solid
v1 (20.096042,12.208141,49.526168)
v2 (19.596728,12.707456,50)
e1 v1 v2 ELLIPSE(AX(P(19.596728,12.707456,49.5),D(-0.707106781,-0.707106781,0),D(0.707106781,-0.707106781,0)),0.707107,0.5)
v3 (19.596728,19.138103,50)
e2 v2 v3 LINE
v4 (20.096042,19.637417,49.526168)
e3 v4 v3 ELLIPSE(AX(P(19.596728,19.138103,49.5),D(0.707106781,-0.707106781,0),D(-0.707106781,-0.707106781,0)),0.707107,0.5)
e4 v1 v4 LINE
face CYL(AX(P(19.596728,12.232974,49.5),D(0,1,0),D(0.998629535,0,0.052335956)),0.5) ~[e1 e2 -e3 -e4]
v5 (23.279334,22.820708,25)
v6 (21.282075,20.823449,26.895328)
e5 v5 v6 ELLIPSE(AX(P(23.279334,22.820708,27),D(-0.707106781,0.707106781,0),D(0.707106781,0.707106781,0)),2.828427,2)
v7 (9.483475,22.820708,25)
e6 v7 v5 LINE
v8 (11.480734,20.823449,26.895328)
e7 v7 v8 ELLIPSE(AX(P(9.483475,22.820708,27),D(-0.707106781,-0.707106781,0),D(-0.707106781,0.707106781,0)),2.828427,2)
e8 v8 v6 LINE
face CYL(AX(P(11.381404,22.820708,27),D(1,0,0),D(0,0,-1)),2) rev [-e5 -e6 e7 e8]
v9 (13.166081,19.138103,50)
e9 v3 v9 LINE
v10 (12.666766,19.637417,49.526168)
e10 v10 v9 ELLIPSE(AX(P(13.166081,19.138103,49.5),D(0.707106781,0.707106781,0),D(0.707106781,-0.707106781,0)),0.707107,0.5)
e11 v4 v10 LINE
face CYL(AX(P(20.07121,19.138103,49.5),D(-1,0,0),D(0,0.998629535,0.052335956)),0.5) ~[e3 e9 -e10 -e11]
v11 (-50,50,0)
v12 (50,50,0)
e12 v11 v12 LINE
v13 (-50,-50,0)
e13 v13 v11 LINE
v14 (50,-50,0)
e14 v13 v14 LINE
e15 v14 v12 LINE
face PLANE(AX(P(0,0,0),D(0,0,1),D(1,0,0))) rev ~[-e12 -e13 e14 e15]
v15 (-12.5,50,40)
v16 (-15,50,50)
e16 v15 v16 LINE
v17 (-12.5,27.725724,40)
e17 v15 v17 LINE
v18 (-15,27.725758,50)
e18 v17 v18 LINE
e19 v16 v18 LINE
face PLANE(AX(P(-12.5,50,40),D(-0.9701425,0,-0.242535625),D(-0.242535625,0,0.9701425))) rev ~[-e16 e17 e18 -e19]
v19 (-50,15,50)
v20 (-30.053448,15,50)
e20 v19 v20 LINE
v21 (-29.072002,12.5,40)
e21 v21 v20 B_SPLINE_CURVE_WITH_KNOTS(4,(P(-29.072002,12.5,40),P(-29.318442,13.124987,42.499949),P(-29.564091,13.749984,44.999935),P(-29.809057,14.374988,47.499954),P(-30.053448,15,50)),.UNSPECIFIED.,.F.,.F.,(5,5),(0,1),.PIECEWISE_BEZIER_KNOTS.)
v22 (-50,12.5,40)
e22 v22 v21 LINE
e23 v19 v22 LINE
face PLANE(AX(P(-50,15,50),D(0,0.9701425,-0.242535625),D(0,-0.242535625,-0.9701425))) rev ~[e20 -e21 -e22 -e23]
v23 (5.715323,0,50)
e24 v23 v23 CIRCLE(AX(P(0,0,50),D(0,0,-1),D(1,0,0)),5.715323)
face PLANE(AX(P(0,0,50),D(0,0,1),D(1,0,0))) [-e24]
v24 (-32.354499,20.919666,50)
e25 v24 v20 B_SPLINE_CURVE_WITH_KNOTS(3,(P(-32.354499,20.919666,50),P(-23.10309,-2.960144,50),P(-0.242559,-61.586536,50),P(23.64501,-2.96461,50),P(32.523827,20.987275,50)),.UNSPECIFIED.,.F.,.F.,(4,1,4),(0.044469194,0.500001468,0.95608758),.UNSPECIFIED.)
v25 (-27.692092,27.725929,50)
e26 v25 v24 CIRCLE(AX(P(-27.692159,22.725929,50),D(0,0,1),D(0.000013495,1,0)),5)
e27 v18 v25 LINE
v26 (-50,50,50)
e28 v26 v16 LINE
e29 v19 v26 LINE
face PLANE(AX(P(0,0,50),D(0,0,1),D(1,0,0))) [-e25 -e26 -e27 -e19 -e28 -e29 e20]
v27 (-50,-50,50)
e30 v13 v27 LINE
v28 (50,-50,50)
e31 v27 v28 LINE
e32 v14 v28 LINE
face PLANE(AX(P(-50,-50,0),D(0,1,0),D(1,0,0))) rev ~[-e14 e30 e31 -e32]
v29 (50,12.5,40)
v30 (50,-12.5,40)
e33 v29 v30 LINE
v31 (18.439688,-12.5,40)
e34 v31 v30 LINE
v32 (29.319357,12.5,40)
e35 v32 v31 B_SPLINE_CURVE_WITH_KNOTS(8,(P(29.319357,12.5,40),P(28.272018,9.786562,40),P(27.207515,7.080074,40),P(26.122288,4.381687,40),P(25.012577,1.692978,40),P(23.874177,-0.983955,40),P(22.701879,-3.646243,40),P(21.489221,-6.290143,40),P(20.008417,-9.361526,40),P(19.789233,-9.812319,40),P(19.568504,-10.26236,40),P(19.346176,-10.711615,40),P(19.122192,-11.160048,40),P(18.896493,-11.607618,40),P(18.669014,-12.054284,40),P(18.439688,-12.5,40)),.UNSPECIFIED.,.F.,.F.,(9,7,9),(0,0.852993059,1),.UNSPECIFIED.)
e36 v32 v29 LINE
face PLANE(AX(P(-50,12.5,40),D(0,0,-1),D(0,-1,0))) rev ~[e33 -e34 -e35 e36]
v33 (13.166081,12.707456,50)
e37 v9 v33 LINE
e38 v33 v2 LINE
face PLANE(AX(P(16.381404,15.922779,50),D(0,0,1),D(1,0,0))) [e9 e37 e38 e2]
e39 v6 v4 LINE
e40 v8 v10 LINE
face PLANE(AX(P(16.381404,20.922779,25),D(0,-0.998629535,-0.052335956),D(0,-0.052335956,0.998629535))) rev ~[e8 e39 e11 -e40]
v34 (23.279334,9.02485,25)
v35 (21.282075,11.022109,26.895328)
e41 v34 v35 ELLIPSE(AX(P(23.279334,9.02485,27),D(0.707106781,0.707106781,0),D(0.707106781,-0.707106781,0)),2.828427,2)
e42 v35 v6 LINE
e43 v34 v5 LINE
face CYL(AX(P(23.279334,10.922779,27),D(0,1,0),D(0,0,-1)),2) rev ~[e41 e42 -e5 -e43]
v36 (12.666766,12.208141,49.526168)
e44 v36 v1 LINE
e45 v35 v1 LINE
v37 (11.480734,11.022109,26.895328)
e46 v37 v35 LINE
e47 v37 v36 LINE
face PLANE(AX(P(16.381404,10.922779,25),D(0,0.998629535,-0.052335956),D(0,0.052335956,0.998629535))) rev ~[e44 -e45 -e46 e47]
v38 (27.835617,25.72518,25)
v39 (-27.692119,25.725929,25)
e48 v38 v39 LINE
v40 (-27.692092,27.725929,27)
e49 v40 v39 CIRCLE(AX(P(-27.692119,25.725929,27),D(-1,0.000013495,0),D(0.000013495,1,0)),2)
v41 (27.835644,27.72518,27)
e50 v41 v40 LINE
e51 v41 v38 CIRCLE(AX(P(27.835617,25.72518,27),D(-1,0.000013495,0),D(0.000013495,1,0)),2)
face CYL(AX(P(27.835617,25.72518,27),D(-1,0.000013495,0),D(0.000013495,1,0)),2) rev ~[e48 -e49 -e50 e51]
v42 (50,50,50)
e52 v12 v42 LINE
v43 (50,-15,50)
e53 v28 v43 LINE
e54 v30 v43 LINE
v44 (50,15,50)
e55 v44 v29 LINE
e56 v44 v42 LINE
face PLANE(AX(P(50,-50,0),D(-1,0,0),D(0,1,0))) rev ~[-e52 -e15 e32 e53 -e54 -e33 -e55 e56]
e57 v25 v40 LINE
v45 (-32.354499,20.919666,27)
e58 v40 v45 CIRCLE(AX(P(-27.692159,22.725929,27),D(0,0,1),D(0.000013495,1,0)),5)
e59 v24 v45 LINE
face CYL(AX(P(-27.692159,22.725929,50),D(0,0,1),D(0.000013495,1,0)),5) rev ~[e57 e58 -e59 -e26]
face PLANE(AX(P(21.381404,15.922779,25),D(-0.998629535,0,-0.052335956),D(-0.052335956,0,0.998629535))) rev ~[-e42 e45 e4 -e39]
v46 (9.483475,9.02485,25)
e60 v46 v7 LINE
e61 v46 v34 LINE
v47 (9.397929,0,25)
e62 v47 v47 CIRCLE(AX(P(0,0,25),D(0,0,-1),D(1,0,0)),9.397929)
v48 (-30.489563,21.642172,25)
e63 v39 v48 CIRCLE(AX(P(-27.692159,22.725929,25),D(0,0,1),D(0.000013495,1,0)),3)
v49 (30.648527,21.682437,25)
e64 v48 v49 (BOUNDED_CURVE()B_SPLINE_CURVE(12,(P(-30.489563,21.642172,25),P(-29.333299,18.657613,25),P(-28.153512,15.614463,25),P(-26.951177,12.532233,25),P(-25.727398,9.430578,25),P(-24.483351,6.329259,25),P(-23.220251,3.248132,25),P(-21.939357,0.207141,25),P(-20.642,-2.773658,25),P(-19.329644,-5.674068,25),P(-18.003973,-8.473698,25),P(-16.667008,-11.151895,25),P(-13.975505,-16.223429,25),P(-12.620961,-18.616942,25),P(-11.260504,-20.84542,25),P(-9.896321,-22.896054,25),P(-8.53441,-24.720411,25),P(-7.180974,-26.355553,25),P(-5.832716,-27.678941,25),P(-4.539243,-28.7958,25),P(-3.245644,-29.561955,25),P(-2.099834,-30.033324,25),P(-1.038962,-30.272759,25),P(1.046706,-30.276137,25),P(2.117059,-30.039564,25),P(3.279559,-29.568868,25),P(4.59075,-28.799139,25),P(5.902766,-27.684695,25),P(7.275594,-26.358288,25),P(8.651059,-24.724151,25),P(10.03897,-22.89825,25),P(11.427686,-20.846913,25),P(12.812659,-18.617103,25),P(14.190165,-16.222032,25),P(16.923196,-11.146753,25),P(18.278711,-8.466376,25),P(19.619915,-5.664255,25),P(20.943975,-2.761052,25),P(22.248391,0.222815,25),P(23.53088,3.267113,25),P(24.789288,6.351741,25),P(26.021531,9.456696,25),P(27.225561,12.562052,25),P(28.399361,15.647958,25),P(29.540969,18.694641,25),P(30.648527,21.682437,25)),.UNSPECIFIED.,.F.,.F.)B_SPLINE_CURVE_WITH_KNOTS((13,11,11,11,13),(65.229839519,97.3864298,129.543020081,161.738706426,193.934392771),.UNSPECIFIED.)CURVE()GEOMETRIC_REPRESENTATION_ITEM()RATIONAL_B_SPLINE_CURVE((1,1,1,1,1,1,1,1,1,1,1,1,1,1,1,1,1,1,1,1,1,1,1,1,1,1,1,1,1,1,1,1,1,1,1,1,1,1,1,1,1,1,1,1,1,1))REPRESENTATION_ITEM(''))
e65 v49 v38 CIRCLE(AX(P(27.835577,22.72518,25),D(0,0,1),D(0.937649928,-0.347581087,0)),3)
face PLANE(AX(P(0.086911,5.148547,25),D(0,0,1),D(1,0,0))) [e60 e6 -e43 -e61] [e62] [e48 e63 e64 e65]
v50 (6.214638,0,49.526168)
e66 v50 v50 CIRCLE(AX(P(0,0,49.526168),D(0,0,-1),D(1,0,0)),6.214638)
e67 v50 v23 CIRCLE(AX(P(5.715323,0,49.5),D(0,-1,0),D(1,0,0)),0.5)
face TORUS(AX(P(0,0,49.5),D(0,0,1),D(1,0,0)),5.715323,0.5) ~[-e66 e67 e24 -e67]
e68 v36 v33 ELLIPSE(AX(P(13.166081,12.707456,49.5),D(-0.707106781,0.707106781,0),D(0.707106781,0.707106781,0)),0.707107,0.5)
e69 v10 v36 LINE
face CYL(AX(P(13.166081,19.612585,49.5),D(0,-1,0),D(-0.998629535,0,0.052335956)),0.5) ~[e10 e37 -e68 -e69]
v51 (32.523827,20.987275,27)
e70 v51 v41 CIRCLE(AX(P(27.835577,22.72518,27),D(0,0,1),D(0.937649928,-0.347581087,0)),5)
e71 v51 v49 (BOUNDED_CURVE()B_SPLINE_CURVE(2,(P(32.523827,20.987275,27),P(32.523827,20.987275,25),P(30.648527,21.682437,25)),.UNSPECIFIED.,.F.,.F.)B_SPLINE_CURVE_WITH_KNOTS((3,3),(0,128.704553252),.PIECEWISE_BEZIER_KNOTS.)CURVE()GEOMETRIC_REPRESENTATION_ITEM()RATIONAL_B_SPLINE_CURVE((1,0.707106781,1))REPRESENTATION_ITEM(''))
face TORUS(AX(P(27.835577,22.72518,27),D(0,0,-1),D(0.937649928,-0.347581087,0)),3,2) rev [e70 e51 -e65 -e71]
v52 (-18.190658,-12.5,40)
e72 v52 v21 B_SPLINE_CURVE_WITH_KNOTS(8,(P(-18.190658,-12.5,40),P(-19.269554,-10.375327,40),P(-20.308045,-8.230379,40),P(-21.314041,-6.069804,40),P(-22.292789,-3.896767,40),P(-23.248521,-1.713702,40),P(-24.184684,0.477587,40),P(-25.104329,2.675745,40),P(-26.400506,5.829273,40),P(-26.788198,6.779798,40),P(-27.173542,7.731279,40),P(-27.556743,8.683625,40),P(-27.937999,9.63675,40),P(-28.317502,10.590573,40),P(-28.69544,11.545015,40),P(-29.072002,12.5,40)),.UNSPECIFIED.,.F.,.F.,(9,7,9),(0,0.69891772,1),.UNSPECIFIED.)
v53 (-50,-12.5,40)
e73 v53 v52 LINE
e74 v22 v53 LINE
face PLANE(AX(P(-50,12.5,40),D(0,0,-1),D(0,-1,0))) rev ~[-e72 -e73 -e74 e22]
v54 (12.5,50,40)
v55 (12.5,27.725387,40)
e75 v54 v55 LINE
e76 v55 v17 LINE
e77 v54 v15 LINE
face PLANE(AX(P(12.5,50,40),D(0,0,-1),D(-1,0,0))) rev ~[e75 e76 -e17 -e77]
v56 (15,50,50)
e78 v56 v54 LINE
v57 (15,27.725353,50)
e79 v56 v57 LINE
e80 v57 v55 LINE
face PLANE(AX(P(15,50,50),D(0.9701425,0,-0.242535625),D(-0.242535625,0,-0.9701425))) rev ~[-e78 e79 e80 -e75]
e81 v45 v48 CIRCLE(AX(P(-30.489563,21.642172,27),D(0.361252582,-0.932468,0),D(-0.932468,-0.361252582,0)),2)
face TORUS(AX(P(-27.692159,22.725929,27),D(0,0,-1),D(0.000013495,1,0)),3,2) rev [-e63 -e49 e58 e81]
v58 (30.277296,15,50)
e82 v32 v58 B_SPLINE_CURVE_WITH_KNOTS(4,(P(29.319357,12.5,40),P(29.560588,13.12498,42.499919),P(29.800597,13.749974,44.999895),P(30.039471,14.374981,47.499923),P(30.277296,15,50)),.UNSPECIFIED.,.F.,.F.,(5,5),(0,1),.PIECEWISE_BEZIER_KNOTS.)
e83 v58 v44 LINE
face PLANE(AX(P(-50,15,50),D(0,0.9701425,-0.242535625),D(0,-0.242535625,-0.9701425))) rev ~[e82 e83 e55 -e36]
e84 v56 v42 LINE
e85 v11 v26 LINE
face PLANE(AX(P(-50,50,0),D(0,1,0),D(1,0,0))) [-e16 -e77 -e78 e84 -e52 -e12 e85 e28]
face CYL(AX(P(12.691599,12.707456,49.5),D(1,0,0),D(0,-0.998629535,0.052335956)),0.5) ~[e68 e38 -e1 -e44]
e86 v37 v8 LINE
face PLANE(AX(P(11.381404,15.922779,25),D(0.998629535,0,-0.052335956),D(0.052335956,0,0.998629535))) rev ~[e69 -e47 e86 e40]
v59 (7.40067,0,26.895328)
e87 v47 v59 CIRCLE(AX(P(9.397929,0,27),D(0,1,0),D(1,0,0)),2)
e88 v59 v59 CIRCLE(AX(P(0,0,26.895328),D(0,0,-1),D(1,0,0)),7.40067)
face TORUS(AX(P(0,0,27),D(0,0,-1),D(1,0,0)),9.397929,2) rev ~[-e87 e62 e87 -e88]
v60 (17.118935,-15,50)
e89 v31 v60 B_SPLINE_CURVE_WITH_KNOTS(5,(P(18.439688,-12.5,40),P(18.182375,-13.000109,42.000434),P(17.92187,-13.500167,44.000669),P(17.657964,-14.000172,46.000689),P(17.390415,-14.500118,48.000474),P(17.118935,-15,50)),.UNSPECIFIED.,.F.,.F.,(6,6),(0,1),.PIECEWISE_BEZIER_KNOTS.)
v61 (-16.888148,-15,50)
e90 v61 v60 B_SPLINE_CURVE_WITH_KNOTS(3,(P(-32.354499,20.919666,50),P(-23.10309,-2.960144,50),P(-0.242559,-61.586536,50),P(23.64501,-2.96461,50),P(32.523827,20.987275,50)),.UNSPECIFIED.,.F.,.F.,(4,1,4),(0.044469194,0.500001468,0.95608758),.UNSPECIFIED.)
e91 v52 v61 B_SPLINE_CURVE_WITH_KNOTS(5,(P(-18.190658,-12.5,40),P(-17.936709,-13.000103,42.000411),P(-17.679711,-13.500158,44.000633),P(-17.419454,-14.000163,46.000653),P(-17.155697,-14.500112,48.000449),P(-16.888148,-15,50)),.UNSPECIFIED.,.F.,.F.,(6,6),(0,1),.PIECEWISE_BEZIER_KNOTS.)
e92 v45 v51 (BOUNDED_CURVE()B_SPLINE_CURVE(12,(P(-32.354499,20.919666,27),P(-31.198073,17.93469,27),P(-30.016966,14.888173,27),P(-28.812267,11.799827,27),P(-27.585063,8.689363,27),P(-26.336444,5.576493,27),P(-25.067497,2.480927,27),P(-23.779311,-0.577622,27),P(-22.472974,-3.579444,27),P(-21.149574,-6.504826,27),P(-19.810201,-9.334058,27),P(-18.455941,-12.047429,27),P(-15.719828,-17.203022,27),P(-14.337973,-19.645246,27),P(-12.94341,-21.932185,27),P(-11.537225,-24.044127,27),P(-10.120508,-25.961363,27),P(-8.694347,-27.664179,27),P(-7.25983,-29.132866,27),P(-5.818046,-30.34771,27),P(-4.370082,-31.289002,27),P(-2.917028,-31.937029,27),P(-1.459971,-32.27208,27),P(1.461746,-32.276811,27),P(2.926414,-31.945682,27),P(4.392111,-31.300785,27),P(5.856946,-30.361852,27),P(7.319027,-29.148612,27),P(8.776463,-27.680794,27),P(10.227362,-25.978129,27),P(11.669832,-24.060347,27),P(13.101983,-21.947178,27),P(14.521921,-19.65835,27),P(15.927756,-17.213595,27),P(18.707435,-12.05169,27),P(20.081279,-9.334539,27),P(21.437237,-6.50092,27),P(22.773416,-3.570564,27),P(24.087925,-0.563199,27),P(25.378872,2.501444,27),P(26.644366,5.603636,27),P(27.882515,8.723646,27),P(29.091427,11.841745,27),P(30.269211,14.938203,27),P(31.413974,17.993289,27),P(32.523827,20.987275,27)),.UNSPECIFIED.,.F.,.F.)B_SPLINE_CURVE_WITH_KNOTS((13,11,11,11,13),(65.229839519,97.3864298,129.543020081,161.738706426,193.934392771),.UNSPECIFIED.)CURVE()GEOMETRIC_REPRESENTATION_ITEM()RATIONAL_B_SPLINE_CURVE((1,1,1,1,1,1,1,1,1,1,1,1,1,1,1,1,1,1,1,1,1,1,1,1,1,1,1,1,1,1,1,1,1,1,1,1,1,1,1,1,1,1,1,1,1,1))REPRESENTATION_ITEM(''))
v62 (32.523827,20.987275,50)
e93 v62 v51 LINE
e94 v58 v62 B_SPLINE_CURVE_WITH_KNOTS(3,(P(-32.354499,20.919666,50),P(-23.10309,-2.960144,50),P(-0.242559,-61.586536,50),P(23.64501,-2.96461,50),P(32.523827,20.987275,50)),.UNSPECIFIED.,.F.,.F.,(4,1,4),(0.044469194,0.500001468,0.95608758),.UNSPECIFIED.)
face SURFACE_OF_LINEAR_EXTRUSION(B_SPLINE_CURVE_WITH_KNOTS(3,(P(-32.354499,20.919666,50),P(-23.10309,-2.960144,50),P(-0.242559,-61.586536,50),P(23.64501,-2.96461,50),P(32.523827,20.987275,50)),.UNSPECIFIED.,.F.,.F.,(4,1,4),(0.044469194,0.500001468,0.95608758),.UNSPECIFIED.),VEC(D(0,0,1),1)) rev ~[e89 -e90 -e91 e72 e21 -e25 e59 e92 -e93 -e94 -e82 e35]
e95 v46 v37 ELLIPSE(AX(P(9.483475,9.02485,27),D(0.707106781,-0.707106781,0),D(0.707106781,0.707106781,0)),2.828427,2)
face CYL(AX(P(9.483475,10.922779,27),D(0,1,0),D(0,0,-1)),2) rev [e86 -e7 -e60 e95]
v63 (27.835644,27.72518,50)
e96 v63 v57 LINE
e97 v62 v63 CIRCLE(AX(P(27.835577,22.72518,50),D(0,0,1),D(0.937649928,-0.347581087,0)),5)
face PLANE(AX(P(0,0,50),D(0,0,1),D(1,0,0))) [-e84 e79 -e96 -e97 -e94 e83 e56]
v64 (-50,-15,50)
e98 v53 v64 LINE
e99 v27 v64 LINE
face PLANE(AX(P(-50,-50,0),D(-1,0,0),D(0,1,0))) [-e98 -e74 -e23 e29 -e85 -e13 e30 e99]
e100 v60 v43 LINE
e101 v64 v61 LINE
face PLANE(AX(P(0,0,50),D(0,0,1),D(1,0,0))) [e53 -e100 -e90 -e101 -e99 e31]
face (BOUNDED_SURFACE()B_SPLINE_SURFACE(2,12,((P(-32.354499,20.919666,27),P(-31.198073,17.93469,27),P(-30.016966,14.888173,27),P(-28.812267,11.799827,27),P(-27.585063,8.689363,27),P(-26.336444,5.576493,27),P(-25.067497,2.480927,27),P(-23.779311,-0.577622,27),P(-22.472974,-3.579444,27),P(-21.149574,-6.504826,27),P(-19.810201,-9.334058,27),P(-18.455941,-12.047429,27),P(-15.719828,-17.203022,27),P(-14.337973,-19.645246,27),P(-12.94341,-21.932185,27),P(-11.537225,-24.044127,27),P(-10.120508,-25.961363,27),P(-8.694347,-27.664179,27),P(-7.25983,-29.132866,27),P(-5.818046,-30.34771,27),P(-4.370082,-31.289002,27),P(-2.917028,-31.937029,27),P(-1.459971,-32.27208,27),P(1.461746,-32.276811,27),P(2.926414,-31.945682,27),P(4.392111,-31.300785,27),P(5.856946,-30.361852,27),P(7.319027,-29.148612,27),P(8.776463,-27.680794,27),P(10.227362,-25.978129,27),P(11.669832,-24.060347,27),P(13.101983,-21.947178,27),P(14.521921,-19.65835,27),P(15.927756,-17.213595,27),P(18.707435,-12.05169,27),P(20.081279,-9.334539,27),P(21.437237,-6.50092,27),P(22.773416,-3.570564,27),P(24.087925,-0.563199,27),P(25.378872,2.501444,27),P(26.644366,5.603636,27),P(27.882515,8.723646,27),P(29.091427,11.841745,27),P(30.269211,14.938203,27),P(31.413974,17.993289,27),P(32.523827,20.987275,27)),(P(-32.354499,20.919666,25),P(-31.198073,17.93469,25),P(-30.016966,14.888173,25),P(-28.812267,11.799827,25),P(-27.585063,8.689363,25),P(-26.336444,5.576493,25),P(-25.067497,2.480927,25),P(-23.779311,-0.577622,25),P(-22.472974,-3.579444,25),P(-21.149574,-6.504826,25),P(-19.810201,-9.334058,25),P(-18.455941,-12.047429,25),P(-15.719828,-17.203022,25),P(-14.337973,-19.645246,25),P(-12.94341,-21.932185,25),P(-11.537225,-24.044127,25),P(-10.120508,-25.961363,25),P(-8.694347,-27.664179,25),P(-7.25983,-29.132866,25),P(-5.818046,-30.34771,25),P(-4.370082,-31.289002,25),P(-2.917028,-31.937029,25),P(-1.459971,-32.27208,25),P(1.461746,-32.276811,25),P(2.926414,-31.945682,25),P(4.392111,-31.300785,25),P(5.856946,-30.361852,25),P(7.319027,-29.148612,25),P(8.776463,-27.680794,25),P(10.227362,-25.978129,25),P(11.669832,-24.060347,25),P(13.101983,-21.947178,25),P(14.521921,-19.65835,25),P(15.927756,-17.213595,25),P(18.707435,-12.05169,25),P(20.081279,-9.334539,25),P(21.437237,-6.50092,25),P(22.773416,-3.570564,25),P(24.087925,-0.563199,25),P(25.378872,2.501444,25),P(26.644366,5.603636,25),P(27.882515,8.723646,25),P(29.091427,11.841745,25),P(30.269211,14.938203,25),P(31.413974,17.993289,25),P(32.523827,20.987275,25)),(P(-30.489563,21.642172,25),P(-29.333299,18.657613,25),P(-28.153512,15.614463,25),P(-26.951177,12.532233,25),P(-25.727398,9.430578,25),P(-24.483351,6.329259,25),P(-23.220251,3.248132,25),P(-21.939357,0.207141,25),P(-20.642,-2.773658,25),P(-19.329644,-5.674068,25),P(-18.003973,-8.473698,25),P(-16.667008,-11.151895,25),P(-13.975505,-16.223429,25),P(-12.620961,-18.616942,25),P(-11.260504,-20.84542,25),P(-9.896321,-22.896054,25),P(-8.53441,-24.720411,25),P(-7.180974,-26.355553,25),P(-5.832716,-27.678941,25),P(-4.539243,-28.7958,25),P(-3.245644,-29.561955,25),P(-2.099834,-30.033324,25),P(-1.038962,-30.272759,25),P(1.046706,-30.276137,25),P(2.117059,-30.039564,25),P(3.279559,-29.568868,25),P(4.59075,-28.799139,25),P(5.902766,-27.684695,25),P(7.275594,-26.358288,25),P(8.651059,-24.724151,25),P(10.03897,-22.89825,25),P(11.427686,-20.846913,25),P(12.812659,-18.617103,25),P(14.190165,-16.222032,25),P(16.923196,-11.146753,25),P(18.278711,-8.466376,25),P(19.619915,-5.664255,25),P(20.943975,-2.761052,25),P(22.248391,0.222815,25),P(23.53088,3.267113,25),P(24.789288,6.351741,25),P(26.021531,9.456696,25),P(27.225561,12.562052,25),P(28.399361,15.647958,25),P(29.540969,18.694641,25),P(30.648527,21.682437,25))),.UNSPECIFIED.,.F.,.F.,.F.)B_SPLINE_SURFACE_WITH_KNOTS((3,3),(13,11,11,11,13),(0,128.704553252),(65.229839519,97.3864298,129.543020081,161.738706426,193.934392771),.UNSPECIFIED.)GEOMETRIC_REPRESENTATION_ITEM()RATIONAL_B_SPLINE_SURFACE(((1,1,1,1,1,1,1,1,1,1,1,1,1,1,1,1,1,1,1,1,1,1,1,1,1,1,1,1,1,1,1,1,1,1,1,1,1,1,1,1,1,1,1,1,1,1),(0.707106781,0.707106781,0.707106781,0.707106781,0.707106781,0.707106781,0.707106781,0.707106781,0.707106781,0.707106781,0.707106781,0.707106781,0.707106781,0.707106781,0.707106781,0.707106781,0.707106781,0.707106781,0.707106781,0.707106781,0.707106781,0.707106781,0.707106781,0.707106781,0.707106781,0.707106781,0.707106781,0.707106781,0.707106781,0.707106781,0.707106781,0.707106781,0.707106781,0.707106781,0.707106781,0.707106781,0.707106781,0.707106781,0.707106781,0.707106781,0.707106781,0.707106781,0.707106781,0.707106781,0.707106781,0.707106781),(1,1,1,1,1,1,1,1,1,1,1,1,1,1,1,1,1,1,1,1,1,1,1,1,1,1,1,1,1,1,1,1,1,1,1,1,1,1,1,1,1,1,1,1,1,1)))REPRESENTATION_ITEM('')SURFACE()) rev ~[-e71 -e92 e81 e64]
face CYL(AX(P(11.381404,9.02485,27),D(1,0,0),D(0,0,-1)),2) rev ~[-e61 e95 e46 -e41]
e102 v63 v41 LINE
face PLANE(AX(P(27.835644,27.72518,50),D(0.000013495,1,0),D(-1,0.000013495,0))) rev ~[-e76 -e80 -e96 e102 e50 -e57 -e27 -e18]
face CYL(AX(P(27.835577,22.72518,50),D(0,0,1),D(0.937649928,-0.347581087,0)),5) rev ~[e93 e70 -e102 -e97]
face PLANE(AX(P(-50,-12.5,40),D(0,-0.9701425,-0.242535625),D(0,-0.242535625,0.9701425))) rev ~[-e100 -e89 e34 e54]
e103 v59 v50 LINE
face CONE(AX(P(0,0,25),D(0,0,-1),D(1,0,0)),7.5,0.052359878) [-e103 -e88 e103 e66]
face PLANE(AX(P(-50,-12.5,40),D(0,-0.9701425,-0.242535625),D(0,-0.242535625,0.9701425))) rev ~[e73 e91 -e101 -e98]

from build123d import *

# Parameters (mm, degrees)
F0_W     = 100
F0_H     = 100
F1_DEPTH = 50
F3_DEPTH = 25
F5_DEPTH = 22.275646797
F7_DEPTH = 100
F8_R     = 7.5
F8_W     = 10
F8_H     = 10
F9_DEPTH = 25
F9_TAPER = 3
F10_R    = 2
F11_R    = 0.5
F12_R    = 0.5


with BuildPart() as f1:
    # F0 (on Top) → F1 (new body)
    with BuildSketch(Plane.XY):
        Rectangle(F0_W, F0_H)
    extrude(amount=F1_DEPTH)

    # F2 (on face) → F3 (cut)
    with BuildSketch(Plane.XY.offset(50)):
        with BuildLine():
            ThreePointArc((-27.6920917798, 27.7259293121), (-31.8171440994, 25.5516150722), (-32.3544992545, 20.9196664012))
            add(Edge.make_bspline(
                [(-32.3544992545, 20.9196664012), (-23.103090057, -2.9601436233), (-0.2425590805, -61.5865364676), (23.6450097648, -2.9646096828), (32.5238265853, 20.9872745586)],
                knots=[0.0444691943, 0.0444691943, 0.0444691943, 0.0444691943, 0.5000014683, 0.9560875796, 0.9560875796, 0.9560875796, 0.9560875796], degree=3))
            ThreePointArc((32.5238265853, 20.9872745586), (31.9398334839, 25.5808897558), (27.8356444162, 27.7251799922))
            Line((27.8356444162, 27.7251799922), (-27.6920917798, 27.7259293121))
        make_face()
    extrude(amount=-F3_DEPTH, mode=Mode.SUBTRACT)

    # F4 (on face) → F5 (cut, through all)
    with BuildSketch(Plane(origin=(0, 50, 0), x_dir=(-1, 0, 0), z_dir=(0, 1, 0))):
        Polygon((15, 50), (-15, 50), (-12.5, 40), (12.5, 40), align=None)
    extrude(amount=-F5_DEPTH, mode=Mode.SUBTRACT)

    # F6 (on face) → F7 (cut)
    with BuildSketch(Plane(origin=(-50, 0, 0), x_dir=(0, -1, 0), z_dir=(-1, 0, 0))):
        Polygon((15, 50), (-15, 50), (-12.5, 40), (12.5, 40), align=None)
    extrude(amount=-F7_DEPTH, mode=Mode.SUBTRACT)

    # F8 (on face) → F9 (join)
    with BuildSketch(Plane.XY.offset(25)):
        Circle(F8_R)
        with Locations((16.3814044744, 15.9227793291)):
            Rectangle(F8_W, F8_H)
    extrude(amount=F9_DEPTH, taper=F9_TAPER)

    # F10
    f10_edges = [f1.edges().sort_by_distance(p)[0] for p in [
        (0.071776, 27.725555, 25),
        (31.939833, 25.58089, 25),
        (-31.817144, 25.551615, 25),
        (0.102186, -32.273864, 25),
        (-7.5, 0, 25),
        (11.381404, 15.922779, 25),
        (16.381404, 10.922779, 25),
        (21.381404, 15.922779, 25),
        (16.381404, 20.922779, 25),
    ]]
    fillet(f10_edges, radius=F10_R)

    # F11
    f11_edges = [f1.edges().sort_by_distance(p)[0] for p in [
        (-6.189806, 0, 50),
    ]]
    fillet(f11_edges, radius=F11_R)

    # F12
    f12_edges = [f1.edges().sort_by_distance(p)[0] for p in [
        (16.381404, 12.232974, 50),
        (12.691599, 15.922779, 50),
        (16.381404, 19.612585, 50),
        (20.07121, 15.922779, 50),
    ]]
    fillet(f12_edges, radius=F12_R)


solid = f1.part
